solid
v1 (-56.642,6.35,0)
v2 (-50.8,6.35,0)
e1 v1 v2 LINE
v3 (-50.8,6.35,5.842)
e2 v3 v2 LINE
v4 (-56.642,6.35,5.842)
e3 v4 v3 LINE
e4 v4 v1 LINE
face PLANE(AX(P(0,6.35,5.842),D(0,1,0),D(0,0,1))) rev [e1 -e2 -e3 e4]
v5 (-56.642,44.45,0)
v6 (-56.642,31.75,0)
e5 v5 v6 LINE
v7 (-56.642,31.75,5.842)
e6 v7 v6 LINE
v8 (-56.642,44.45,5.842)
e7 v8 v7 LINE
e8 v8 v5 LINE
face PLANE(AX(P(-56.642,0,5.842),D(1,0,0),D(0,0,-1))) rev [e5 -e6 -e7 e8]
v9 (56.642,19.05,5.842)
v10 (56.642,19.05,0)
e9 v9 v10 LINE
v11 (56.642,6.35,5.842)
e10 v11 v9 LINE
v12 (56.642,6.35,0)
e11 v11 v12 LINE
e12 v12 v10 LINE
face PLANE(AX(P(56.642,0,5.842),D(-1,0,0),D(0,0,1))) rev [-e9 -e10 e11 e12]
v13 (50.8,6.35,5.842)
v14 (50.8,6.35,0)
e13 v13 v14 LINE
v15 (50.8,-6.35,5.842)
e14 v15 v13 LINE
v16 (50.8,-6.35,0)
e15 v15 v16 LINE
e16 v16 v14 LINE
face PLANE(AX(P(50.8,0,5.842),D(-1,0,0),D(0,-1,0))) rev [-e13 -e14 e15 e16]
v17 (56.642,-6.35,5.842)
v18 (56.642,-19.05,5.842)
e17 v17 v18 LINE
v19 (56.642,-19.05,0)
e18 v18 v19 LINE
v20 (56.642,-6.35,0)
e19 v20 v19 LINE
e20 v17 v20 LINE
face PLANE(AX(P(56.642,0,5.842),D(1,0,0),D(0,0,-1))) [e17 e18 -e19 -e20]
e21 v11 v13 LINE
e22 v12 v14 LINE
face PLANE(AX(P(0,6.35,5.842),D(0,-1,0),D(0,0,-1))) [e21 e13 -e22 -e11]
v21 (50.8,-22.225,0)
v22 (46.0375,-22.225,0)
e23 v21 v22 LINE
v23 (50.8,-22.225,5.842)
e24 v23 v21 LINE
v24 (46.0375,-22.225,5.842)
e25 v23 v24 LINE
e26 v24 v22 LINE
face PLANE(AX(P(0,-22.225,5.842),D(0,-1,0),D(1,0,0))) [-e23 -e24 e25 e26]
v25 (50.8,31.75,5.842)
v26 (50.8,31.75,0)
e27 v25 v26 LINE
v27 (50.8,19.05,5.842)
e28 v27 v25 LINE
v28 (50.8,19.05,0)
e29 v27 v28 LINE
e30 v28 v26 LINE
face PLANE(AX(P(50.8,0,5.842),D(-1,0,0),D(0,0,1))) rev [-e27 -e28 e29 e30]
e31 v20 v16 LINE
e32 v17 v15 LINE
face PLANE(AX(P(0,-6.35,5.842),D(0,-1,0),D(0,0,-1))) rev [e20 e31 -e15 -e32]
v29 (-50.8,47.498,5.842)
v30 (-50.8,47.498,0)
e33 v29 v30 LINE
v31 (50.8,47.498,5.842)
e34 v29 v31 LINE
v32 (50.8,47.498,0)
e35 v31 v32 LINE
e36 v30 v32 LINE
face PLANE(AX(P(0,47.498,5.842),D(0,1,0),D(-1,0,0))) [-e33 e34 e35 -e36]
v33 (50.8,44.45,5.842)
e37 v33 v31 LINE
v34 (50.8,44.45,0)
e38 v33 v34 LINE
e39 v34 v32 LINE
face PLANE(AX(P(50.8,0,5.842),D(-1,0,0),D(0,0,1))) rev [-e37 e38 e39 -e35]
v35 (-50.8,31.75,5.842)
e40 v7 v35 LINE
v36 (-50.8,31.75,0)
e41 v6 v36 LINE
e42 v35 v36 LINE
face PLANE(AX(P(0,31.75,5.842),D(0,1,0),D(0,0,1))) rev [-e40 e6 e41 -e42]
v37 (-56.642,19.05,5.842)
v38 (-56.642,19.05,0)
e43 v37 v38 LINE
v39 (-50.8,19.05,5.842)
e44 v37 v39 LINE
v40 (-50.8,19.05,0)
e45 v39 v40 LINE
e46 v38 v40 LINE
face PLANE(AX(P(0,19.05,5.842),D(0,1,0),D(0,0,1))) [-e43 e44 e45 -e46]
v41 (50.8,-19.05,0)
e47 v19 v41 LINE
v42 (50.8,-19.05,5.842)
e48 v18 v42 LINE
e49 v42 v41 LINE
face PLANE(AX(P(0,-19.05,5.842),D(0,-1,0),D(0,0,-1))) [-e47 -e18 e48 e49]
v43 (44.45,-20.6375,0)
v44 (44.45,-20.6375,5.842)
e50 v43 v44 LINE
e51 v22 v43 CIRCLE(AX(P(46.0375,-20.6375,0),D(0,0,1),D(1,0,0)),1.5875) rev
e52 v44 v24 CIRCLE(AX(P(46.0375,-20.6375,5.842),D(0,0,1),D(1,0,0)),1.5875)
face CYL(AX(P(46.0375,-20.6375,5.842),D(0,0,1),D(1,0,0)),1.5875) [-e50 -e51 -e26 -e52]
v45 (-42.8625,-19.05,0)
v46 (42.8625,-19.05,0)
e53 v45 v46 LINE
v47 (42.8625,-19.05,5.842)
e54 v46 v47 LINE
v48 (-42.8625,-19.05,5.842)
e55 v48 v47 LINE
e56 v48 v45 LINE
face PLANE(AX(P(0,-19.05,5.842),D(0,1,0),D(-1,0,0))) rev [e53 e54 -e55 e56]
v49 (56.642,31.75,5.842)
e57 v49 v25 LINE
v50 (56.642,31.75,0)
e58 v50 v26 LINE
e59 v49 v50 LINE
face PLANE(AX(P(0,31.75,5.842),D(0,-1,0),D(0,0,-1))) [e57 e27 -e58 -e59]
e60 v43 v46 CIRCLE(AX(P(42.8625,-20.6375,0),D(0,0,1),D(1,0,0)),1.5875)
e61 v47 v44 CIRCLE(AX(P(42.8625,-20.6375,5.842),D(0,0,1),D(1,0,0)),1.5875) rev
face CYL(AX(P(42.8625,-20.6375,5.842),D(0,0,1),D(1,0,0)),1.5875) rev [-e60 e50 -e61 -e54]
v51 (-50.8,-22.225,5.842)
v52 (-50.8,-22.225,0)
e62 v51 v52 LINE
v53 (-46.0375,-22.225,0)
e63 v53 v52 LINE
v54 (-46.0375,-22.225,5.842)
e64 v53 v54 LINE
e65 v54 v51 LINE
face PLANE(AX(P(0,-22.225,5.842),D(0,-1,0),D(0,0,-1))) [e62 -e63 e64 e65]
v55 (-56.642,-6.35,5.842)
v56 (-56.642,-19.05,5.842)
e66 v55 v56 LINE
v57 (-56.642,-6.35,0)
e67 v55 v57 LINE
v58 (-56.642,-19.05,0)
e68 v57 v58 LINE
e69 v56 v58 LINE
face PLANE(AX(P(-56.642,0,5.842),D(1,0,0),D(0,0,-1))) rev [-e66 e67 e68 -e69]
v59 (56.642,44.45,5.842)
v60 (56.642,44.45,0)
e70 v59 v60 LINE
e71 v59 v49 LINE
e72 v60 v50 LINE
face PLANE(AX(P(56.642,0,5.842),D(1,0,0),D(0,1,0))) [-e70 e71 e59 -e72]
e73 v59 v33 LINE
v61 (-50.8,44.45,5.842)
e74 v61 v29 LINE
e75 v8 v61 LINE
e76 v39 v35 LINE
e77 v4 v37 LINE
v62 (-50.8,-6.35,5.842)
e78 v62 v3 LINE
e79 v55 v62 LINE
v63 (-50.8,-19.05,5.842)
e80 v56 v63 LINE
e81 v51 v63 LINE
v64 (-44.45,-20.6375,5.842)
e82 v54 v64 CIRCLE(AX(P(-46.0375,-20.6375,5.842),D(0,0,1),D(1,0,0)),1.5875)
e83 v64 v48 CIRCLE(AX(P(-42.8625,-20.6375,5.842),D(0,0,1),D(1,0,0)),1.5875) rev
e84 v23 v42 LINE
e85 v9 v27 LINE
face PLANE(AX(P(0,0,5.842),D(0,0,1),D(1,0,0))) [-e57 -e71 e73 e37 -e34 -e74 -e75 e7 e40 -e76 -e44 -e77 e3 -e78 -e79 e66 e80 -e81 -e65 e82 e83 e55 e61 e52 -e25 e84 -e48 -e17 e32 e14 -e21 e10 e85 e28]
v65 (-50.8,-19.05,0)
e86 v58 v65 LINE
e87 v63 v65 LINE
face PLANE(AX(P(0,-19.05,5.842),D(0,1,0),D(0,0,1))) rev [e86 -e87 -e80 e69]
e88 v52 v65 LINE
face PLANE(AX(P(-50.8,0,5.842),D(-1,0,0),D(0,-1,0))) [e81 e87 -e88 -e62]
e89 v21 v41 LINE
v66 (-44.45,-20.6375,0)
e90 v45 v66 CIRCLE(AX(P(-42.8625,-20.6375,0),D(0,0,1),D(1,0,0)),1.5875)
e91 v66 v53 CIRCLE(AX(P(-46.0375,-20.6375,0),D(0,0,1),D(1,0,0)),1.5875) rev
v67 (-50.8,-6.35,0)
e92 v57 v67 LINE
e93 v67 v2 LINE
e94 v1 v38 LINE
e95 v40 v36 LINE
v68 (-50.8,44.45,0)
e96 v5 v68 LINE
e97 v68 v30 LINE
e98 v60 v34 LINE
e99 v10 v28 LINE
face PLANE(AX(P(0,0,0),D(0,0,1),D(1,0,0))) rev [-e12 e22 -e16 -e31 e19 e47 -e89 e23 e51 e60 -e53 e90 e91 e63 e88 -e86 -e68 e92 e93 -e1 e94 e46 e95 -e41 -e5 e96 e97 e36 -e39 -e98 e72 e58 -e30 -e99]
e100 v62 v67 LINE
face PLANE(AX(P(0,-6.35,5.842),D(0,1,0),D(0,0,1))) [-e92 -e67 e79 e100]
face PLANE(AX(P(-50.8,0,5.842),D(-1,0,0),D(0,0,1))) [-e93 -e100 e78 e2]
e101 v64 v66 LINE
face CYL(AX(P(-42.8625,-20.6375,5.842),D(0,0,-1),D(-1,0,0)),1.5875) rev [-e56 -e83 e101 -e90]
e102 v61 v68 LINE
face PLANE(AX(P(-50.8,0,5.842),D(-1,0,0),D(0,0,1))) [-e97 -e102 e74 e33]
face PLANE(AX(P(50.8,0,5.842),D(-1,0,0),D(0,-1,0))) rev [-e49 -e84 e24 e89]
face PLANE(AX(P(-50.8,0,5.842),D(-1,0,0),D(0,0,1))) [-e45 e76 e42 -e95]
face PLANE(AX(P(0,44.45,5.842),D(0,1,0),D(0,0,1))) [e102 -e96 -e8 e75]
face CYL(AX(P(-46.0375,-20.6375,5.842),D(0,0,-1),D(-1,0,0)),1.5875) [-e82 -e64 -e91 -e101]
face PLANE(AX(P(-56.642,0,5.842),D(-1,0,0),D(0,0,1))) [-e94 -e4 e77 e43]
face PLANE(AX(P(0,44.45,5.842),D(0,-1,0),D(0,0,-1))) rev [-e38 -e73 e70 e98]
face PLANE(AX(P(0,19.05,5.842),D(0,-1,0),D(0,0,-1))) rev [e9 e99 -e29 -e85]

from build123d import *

# Parameters (mm, degrees)
BOSS_EXTRUDE1_DEPTH = 5.842
FILLET1_R           = 1.5875


with BuildPart() as part:
    # Sketch1 → Boss-Extrude1 (new body)
    with BuildSketch(Plane.XY):
        Polygon((50.8, -22.225), (44.45, -22.225), (44.45, -19.05), (-44.45, -19.05), (-44.45, -22.225), (-50.8, -22.225), (-50.8, -19.05), (-56.642, -19.05), (-56.642, -6.35), (-50.8, -6.35), (-50.8, 6.35), (-56.642, 6.35), (-56.642, 19.05), (-50.8, 19.05), (-50.8, 31.75), (-56.642, 31.75), (-56.642, 44.45), (-50.8, 44.45), (-50.8, 47.498), (50.8, 47.498), (50.8, 44.45), (56.642, 44.45), (56.642, 31.75), (50.8, 31.75), (50.8, 19.05), (56.642, 19.05), (56.642, 6.35), (50.8, 6.35), (50.8, -6.35), (56.642, -6.35), (56.642, -19.05), (50.8, -19.05), align=None)
    extrude(amount=BOSS_EXTRUDE1_DEPTH)

    # Fillet1
    fillet1_edges = [part.edges().sort_by_distance(p)[0] for p in [
        (-44.45, -19.05, 2.921),
        (44.45, -19.05, 2.921),
    ]]
    fillet(fillet1_edges, radius=FILLET1_R)
    fillet1_2_edges = [part.edges().sort_by_distance(p)[0] for p in [
        (44.45, -22.225, 2.921),
        (-44.45, -22.225, 2.921),
    ]]
    fillet(fillet1_2_edges, radius=FILLET1_R - 0.0001)  # a hair under: the kernel refuses the full size


solid = part.part
